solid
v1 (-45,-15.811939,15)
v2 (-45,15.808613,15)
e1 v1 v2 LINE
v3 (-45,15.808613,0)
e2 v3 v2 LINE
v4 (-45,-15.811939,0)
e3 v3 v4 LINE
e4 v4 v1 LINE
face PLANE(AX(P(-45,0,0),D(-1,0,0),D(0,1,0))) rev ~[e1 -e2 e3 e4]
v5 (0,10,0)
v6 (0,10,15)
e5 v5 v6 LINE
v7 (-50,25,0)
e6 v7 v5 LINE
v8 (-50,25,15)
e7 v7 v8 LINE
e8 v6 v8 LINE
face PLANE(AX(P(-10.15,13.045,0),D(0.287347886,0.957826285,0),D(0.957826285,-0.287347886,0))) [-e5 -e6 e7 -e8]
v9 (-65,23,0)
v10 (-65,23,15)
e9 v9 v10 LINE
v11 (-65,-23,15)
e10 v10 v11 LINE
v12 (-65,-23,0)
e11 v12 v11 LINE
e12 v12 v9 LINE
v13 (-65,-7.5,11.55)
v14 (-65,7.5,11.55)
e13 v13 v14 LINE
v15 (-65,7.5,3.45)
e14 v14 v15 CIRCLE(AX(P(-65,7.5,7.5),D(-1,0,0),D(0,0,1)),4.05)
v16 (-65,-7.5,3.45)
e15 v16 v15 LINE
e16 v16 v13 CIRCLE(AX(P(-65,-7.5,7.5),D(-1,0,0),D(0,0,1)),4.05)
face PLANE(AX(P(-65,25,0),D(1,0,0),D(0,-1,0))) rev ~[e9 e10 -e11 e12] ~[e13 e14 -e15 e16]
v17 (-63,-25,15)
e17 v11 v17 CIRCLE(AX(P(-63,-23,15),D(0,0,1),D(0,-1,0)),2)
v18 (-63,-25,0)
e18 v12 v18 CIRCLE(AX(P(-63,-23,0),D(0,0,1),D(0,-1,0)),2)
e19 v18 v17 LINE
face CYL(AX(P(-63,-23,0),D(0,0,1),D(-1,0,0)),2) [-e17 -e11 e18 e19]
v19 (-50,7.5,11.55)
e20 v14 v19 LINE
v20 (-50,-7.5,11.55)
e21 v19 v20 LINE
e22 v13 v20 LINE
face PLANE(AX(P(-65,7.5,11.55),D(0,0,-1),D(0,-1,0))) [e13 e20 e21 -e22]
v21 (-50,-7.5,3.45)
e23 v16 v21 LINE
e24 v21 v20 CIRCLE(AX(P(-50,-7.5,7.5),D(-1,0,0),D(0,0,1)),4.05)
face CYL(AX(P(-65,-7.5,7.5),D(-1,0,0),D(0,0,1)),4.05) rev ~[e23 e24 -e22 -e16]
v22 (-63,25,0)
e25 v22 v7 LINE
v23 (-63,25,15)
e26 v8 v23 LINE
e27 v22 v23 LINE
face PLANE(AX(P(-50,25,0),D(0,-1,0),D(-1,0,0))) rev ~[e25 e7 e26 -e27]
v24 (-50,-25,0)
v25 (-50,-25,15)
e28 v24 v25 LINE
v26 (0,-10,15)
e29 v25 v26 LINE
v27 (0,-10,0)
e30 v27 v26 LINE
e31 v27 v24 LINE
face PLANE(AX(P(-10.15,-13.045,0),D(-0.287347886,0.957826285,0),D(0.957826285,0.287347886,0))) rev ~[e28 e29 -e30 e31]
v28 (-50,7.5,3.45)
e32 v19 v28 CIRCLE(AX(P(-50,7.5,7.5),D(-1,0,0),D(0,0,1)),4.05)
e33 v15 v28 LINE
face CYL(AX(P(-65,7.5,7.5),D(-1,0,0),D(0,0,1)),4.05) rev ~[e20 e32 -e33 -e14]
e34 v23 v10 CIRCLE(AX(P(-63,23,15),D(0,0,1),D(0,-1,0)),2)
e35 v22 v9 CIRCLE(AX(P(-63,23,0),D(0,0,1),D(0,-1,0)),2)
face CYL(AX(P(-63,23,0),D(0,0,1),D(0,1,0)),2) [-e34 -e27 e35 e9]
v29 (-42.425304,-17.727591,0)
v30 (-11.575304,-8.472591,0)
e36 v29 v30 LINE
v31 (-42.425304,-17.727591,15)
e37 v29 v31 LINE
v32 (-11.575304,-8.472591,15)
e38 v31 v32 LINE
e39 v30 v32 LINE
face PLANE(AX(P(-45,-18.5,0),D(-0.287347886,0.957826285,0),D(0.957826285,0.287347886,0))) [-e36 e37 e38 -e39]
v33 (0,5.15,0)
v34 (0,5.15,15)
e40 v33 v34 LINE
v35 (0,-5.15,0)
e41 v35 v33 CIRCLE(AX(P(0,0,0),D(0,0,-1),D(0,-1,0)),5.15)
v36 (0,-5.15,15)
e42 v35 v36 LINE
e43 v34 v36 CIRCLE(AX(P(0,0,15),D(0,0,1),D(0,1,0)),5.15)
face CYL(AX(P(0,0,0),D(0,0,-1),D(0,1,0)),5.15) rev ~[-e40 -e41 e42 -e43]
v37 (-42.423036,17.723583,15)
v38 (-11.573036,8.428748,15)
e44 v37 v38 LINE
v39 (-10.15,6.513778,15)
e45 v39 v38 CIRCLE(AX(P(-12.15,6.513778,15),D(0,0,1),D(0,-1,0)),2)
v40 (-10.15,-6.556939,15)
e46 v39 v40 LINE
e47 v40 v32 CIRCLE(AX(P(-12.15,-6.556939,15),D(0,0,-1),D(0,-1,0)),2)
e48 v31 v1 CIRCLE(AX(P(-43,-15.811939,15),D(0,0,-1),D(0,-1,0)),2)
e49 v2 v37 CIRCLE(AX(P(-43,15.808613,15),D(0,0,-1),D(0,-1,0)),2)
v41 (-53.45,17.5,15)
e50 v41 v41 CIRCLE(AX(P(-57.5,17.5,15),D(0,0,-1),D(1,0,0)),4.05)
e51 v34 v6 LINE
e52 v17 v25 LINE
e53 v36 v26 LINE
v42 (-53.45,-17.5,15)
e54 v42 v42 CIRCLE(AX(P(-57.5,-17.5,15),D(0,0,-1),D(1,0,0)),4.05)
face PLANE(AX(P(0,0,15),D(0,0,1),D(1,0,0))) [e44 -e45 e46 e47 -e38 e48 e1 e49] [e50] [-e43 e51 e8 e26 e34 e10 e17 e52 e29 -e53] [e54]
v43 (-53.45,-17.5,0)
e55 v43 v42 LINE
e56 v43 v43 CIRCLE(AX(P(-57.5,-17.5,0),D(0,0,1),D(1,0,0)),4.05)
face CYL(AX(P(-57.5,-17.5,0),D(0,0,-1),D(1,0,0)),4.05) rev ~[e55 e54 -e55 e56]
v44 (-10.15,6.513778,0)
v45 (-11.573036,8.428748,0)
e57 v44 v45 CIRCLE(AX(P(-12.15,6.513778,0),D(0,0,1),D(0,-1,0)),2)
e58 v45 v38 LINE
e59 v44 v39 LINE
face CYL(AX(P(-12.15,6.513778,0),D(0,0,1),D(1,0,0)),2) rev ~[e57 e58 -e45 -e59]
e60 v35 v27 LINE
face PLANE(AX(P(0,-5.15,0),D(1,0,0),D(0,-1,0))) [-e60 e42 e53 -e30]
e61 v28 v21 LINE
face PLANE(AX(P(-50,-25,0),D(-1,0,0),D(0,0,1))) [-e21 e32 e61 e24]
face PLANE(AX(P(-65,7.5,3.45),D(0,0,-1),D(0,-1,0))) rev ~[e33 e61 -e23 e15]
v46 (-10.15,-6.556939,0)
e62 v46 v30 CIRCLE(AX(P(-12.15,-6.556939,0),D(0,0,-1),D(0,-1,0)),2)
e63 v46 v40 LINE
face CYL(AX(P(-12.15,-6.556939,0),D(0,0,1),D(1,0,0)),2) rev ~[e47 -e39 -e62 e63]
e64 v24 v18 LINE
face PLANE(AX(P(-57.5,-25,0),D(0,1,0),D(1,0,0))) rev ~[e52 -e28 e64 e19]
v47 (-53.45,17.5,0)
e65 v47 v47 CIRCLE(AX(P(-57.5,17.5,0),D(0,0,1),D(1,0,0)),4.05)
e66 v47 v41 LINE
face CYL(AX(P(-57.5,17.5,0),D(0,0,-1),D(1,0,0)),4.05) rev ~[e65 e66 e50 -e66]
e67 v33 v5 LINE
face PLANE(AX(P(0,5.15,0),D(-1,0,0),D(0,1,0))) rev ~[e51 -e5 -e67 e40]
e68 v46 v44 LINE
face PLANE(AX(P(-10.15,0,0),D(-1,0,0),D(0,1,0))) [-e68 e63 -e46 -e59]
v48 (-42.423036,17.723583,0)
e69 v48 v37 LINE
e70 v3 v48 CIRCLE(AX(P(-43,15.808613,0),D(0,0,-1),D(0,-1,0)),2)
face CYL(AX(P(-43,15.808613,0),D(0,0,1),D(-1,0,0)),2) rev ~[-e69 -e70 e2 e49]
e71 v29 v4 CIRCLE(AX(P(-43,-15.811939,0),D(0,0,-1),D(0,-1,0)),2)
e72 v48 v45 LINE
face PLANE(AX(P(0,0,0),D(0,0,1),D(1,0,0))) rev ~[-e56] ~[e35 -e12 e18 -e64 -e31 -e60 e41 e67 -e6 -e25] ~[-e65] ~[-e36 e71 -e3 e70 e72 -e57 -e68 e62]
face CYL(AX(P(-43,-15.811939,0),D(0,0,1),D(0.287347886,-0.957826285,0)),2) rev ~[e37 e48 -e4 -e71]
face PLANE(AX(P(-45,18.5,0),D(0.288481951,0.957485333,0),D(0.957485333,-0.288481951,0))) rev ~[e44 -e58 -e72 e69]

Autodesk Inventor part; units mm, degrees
ref_plane "YZ Plane" through (0, 0, 0) normal (1, 0, 0) x (0, 1, 0)
ref_plane "XZ Plane" through (0, 0, 0) normal (0, 1, 0) x (-1, 0, 0)
ref_plane "XY Plane" through (0, 0, 0) normal (0, 0, 1) x (1, 0, 0)
sketch "Sketch1" plane through (0, 0, 0) normal (0, 0, 1) x (1, 0, 0)
  arc A0 (0, 5.15) -> (0, -5.15) centre (0, 0) ccw
  line L0 (0, 5.15) -> (0, 10)
  line L1 (0, -5.15) -> (0, -10)
  line L2 (0, 0) -> (-50, 0)
  line L3 (-50, 0) -> (-50, 25)
  line L4 (-50, 0) -> (-50, -25)
  line L5 (-50, -25) -> (0, -10)
  line L6 (-50, 25) -> (0, 10)
  line L7 (-50, 25) -> (-65, 25)
  line L8 (-65, 25) -> (-65, -25)
  line L9 (-65, -25) -> (-50, -25)
  line L10 (-50, 0) -> (-45, 0)
  line L11 (-45, 0) -> (-45, 23.5)
  line L12 (-45, 0) -> (-45, -23.5)
  line L13 (-5.15, 0) -> (-10.15, 0)
  line L14 (-10.15, 0) -> (-10.15, 13.045)
  line L15 (-10.15, 0) -> (-10.15, -13.045)
  line L16 (-45, -23.5) -> (-45, -18.5)
  line L17 (-45, -18.5) -> (-10.15, -8.045)
  line L18 (-45, 23.5) -> (-45, 18.5)
  line L19 (-45, 18.5) -> (-10.15, 8)
  line L20 (-57.5, 25) -> (-57.5, -25)
  line L21 (-65, 0) -> (-50, 0)
  line L22 (-65, 25) -> (-50, 10)
  line L23 (-65, 25) -> (-43.7868, 25) construction
  line L24 (-65, -25) -> (-50, -10)
  line L25 (-65, -25) -> (-43.7868, -25) construction
  circle A1 centre (-57.5, -17.5) radius 4.05
  circle A2 centre (-57.5, 17.5) radius 4.05
  dimension "d0" = 10.3
  dimension "d3" = 50
  dimension "d4" = 25
  dimension "d5" = 25
  dimension "d6" = 15
  dimension "d7" = 50
  dimension "d8" = 90
  dimension "d9" = 5
  dimension "d10" = 5
  dimension "d11" = 5
  dimension "d12" = 5
  dimension "d13" = 45
  dimension "d14" = 45
  dimension "d15" = 8.1
  dimension "d16" = 8.1
  dimension "d26" = 50
  dimension "d27" = 10
  dimension "d28" = 20
extrude "Extrusion1" add sketch "Sketch1" along normal blind 15 contours A0 L2 L14 L6 L0 | A0 L1 L5 L15 L2 | L14 L19 L11 L6 | L12 L5 L4 L2 | L2 L3 L6 L11 | L15 L5 L12 L17 | L21 L20 A2 L22 L3 | L4 L24 A1 L20 L21 | L3 L22 A2 L20 L7 | L4 L9 L20 A1 L24 | L21 L8 L22 A2 L20 | L20 A1 L24 L8 L21 | L20 A2 L22 L7 | L9 L24 A1 L20
sketch "Sketch2" plane through (-65, -25, 0) normal (-1, 0, 0) x (0, 0, 1)
  line L0 (0, 50) -> (0, 0) projected
  line L1 (0, 0) -> (15, 0) projected
  line L2 (15, 50) -> (15, 0) projected
  line L3 (0, 50) -> (15, 50) projected
  line L4 (0, 25) -> (15, 25)
  line L5 (7.5, 25) -> (7.5, 17.5)
  line L6 (7.5, 25) -> (7.5, 32.5)
  circle A0 centre (7.5, 32.5) radius 4.05
  circle A1 centre (7.5, 17.5) radius 4.05
  line L7 (7.5, 32.5) -> (11.55, 32.5)
  line L8 (11.55, 32.5) -> (11.55, 17.5)
  line L9 (7.5, 32.5) -> (3.45, 32.5)
  line L10 (3.45, 32.5) -> (3.45, 17.5)
  dimension "d19" = 7.5
  dimension "d20" = 7.5
  dimension "d21" = 8.1
  dimension "d22" = 8.1
extrude "Extrusion2" cut sketch "Sketch2" against normal up to surface (15 mm away) contours L10 A0 L6 L4 | L4 L5 A1 L10 | L6 A0 L8 L4 | L4 L8 A1 L5 | L9 L6 A0 | A0 L7 L9 | A1 | L6 L7 A0
fillet "Fillet1" radius 2 4 edges at (-45, -18.5, 7.5) (-10.15, -8.045, 7.5) (-45, 18.5, 7.5) (-10.15, 8, 7.5)
fillet "Fillet2" radius 2 2 edges at (-65, -25, 7.5) (-65, 25, 7.5)
properties part number "Rod_support_1"
